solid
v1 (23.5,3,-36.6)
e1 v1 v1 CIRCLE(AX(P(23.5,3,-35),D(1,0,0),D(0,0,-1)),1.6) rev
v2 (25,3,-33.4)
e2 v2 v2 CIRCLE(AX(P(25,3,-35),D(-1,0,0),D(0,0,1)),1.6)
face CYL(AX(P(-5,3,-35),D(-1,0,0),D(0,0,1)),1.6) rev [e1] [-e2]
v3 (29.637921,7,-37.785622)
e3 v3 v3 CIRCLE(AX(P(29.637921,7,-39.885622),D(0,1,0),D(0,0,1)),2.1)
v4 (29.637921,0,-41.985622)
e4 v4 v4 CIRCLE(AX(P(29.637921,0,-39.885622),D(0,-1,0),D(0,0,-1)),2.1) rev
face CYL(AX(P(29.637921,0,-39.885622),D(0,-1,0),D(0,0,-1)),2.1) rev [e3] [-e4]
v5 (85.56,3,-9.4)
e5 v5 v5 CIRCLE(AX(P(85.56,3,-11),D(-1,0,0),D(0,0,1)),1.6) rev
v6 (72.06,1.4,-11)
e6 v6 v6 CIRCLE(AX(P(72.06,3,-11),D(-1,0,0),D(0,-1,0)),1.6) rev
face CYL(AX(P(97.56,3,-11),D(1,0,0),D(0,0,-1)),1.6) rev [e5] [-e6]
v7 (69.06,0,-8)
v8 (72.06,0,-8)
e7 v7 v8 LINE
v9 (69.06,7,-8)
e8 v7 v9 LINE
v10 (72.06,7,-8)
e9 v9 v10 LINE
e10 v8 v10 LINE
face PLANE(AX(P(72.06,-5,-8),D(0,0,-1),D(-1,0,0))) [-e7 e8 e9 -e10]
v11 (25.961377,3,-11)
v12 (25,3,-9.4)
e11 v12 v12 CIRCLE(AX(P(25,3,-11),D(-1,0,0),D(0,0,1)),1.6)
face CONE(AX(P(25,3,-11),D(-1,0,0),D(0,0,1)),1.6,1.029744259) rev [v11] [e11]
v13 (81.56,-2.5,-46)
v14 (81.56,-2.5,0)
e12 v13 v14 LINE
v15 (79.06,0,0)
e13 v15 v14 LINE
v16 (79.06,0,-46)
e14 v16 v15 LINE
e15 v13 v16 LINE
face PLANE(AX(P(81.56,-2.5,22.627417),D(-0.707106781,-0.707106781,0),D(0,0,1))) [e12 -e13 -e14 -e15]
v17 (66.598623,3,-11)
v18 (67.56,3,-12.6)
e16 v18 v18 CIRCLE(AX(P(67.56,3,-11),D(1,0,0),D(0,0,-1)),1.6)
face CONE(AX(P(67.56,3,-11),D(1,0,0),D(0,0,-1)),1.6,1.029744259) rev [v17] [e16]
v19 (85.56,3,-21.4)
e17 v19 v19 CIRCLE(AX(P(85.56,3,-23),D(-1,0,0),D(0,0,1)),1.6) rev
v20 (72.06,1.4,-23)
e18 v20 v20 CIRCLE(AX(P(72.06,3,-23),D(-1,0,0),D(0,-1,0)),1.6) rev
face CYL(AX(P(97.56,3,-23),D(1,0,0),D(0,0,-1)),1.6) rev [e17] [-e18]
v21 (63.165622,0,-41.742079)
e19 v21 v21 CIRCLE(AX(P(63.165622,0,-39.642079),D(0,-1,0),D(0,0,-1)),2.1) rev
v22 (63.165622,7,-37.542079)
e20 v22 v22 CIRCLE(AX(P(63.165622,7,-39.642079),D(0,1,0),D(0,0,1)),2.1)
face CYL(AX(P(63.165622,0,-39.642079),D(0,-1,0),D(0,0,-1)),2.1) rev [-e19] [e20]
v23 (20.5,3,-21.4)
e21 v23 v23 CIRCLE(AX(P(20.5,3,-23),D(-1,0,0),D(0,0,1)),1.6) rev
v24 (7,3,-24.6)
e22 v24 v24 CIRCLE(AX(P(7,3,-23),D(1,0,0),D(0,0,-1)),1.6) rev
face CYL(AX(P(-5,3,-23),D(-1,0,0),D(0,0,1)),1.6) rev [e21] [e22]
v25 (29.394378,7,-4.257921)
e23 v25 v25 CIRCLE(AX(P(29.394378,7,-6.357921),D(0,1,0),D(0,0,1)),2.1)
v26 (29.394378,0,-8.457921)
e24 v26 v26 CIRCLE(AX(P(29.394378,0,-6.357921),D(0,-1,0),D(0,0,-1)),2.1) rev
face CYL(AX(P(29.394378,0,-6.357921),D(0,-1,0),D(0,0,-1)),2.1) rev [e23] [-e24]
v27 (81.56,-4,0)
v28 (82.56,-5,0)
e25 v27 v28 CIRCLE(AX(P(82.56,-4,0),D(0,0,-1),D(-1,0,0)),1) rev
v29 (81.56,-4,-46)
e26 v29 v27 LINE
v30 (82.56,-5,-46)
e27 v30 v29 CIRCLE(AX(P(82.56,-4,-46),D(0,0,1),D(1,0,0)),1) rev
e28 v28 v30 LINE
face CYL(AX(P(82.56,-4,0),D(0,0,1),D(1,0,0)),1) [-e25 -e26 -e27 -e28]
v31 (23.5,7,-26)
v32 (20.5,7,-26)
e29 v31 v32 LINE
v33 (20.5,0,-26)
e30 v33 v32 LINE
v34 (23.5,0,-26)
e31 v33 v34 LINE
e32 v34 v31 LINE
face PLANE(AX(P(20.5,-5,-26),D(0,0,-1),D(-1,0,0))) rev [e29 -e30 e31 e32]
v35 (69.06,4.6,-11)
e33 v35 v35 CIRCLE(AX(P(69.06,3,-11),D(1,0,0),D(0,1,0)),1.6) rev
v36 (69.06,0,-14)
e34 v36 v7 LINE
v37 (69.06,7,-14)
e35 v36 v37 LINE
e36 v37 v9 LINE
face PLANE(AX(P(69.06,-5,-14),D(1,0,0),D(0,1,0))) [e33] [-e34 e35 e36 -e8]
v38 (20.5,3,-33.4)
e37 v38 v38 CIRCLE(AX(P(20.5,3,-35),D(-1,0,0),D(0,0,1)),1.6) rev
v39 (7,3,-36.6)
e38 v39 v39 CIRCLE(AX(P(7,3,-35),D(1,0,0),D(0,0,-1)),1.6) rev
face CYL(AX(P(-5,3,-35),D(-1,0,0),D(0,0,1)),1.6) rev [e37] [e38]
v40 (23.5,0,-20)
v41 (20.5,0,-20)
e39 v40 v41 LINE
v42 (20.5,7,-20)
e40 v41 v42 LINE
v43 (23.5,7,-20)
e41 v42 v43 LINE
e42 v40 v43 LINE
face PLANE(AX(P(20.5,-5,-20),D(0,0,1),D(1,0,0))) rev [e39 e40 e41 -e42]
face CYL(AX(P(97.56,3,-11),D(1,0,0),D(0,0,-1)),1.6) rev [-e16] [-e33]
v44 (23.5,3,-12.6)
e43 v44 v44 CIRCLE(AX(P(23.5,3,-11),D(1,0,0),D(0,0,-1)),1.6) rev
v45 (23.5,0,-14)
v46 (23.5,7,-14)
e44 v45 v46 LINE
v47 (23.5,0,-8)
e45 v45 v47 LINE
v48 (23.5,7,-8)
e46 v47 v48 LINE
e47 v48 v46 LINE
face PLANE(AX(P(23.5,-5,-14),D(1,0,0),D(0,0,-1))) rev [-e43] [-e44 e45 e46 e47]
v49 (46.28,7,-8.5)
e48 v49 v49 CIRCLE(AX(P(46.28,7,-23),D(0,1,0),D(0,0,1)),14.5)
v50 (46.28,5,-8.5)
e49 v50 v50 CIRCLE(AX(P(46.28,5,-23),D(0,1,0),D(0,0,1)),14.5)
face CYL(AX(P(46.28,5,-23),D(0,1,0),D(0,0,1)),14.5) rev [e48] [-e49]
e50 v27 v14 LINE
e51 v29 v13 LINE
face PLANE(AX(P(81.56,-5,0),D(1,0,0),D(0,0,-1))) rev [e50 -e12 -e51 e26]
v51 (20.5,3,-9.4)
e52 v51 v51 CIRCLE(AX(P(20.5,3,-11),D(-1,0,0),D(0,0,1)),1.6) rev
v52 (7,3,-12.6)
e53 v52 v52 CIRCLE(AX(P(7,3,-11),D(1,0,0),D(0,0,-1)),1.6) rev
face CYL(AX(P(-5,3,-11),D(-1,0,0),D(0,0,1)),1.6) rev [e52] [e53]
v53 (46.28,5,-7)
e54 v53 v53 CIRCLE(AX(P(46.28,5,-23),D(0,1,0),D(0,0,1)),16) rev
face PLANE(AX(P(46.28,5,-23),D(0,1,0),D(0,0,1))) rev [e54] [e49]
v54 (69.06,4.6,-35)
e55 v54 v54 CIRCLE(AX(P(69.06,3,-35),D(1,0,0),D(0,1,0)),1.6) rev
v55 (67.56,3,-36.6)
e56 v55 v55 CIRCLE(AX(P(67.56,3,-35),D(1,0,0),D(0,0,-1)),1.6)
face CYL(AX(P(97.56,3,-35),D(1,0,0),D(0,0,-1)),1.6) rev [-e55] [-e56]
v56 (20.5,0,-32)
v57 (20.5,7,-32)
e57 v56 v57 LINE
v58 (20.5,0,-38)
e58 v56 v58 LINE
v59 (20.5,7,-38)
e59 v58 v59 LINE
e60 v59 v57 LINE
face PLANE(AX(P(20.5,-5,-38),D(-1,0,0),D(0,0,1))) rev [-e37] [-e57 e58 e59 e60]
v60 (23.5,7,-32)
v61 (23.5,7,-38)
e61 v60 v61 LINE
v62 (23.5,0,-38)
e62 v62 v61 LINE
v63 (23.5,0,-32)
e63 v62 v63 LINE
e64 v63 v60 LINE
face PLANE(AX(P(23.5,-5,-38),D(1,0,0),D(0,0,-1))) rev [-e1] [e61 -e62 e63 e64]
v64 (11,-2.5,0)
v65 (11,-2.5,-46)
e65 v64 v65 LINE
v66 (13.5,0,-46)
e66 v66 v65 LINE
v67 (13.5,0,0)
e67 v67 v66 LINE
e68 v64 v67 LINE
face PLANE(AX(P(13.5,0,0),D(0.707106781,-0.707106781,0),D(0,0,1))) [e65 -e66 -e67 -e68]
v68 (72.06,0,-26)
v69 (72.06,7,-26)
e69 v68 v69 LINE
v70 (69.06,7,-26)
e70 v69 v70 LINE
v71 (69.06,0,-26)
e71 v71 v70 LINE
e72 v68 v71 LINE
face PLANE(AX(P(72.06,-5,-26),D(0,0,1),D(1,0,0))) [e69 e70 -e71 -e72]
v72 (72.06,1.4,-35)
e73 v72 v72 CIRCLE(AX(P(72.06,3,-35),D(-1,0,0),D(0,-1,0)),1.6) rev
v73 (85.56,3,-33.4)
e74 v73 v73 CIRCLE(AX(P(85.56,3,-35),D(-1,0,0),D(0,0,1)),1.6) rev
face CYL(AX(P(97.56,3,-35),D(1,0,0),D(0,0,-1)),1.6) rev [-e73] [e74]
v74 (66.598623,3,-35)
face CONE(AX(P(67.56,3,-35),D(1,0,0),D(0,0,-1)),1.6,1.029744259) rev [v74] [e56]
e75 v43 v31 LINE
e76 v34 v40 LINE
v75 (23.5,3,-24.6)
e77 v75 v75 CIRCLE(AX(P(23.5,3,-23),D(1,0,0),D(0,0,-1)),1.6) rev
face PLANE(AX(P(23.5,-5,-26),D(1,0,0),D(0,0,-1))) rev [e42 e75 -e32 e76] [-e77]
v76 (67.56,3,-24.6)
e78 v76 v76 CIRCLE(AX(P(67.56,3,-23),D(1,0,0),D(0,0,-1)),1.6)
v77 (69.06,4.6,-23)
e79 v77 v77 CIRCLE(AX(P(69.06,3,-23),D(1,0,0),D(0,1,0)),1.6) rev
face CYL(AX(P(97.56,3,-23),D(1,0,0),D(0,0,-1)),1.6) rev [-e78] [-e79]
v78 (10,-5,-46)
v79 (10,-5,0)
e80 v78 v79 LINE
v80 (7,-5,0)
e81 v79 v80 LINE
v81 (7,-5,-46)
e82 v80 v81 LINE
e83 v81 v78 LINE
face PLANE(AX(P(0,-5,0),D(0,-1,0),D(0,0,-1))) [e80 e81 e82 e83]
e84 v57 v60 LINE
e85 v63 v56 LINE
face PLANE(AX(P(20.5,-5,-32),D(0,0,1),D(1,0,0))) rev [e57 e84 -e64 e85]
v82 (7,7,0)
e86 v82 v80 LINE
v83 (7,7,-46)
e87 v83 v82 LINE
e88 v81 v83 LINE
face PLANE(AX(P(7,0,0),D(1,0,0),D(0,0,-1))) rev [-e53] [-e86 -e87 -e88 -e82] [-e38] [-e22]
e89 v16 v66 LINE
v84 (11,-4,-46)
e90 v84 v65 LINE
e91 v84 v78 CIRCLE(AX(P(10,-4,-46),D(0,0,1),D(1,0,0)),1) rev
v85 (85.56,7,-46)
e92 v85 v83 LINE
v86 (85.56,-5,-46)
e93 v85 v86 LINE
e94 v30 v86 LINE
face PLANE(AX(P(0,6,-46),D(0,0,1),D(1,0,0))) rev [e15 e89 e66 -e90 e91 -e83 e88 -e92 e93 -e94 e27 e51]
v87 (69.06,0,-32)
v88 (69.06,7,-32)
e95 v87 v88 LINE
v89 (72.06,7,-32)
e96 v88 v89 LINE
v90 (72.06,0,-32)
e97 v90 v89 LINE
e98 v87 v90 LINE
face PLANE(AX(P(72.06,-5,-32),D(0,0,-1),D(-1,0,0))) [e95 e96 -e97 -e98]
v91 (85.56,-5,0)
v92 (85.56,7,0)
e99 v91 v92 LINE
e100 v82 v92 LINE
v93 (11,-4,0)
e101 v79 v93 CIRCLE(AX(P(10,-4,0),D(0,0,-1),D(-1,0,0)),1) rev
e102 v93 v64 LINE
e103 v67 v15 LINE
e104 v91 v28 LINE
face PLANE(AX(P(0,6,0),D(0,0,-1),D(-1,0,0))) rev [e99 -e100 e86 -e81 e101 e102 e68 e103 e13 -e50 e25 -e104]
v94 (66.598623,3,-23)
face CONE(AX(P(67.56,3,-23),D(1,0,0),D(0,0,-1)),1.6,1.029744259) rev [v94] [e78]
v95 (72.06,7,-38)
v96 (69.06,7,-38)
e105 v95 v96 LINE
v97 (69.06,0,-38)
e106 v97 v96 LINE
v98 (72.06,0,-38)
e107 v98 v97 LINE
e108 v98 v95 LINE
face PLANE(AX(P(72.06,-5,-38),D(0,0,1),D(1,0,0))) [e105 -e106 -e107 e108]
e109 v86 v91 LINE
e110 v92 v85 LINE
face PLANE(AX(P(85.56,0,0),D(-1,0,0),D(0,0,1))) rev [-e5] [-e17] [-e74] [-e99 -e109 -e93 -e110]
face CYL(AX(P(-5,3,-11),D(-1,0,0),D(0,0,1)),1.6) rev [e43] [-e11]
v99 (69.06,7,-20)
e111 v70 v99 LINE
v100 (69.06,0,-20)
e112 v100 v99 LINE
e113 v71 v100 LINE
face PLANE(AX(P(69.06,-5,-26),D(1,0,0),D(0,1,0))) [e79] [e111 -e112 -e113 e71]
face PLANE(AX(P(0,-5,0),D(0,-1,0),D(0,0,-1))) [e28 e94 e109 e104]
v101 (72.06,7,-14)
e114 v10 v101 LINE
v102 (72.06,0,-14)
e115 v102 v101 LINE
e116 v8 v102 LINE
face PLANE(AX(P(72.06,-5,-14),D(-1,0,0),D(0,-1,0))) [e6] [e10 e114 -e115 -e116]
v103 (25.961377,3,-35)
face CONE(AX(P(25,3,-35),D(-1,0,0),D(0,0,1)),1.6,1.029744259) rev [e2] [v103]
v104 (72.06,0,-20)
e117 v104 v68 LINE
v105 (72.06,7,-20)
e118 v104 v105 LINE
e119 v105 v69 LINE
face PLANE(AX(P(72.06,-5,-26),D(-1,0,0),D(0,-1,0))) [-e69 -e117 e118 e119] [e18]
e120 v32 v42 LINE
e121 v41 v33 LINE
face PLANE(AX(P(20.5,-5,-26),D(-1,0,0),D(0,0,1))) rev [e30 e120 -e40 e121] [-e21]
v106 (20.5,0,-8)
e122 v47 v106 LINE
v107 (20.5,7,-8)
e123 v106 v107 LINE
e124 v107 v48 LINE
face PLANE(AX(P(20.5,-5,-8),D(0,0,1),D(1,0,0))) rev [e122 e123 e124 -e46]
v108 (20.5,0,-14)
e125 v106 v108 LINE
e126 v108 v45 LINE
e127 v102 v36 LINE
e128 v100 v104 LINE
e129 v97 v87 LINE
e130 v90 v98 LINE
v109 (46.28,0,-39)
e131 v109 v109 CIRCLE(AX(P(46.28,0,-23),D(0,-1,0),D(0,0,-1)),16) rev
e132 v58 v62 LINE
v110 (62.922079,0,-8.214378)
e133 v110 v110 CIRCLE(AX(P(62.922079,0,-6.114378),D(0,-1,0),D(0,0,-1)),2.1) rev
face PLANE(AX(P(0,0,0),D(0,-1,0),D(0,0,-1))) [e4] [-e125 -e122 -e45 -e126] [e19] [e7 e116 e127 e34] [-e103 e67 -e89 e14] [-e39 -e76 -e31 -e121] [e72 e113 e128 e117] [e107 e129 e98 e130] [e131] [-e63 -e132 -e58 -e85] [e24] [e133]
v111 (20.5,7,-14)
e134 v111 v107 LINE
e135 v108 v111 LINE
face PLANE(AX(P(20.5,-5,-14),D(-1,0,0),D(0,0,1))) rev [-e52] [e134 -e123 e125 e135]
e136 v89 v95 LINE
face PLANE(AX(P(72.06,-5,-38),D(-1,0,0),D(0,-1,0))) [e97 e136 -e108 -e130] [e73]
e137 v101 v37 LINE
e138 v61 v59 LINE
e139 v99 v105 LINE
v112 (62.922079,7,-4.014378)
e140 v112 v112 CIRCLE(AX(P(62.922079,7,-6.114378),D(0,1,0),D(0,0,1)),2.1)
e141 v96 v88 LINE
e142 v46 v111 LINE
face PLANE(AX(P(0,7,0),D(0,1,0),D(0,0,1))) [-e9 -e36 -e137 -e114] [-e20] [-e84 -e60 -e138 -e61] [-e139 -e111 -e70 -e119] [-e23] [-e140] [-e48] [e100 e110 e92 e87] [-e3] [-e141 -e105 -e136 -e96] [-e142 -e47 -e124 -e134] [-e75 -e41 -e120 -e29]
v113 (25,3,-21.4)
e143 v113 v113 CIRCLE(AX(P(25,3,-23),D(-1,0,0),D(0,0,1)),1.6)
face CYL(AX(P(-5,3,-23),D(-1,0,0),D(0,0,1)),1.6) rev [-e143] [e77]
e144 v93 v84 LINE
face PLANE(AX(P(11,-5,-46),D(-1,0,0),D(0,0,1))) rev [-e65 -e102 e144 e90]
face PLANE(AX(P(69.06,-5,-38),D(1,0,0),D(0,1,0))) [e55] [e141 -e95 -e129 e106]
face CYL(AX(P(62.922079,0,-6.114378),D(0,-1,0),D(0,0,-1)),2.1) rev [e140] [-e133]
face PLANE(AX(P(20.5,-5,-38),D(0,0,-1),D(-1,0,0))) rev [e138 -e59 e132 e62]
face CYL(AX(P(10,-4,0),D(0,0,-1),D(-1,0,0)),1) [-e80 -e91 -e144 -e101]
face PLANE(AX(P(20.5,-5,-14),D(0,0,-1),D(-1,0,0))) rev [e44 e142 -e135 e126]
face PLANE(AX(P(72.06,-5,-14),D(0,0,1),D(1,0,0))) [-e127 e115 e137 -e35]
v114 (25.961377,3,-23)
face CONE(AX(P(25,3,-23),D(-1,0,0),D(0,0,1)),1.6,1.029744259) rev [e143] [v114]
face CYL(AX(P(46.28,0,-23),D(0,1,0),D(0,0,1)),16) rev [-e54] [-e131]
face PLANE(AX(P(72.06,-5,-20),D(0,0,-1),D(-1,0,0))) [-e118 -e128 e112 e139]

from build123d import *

# Parameters (mm, degrees)
SKETCH1_W                  = 92.56
SKETCH1_H                  = 46
BOSS_EXTRUDE1_DEPTH        = 6
BOSS_EXTRUDE2_DEPTH        = 54
SKETCH3_R                  = 16.000000000000007
CUT_EXTRUDE1_DEPTH         = 120.51298506856901
SKETCH4_R                  = 16.000000000000004
CUT_EXTRUDE2_DEPTH         = 117.61626644683837
F_4_2_4_2_DIAMETER_HOLE1_D = 4.2
F_4_2_4_2_DIAMETER_HOLE2_D = 4.2
CHAMFER1_SIZE              = 3.5
CHAMFER2_SIZE              = 6
BOSS_EXTRUDE3_DEPTH        = 46
FILLET1_R                  = 2.5
CHAMFER3_SIZE              = 2.5
FILLET2_R                  = 2.5
M3_CLEARANCE_HOLE2_D       = 3.2
M3_CLEARANCE_HOLE2_DEPTH   = 30
M3_CLEARANCE_HOLE2_TIP     = 0.9613769904440965
M3_CLEARANCE_HOLE1_D       = 3.2
M3_CLEARANCE_HOLE1_DEPTH   = 30
M3_CLEARANCE_HOLE1_TIP     = 0.9613769904440965
SKETCH18_W                 = 3
SKETCH18_H                 = 6.0000000000000036
CUT_EXTRUDE4_DEPTH         = 121.62318848380691
SKETCH19_R                 = 16.000000000000004
SKETCH19_R_2               = 14.499999999999998
BOSS_EXTRUDE10_DEPTH       = 1
SKETCH21_R                 = 16.000000000000004
SKETCH21_R_2               = 2.09999999999999
SKETCH21_R_3               = 2.0999999999999934
BOSS_EXTRUDE12_DEPTH       = 3
FILLET3_R                  = 10
SKETCH22_W                 = 3.9999999999999716
SKETCH22_H                 = 2.4999999999999836
SKETCH22_W_2               = 4.000000000000001
SKETCH22_H_2               = 2.5
CUT_EXTRUDE5_DEPTH         = 98.88009812622792
SKETCH23_W                 = 4.000000000000001
SKETCH23_H                 = 46
BOSS_EXTRUDE13_DEPTH       = 2.5
FILLET4_R                  = 1
CUT_EXTRUDE6_START         = -3
CUT_EXTRUDE6_DEPTH         = 3
BOSS_EXTRUDE14_START       = 1
SKETCH25_R                 = 2.09999999999999
SKETCH25_R_2               = 2.0999999999999934
SKETCH25_R_3               = 14.499999999999998
BOSS_EXTRUDE14_DEPTH       = 1


with BuildPart() as part:
    # Sketch1 → Boss-Extrude1 (new body)
    with BuildSketch(Plane(origin=(0, 0, 0), x_dir=(1, 0, 0), z_dir=(0, 1, 0))):
        with Locations((46.28, 23)):
            Rectangle(SKETCH1_W, SKETCH1_H)
    extrude(amount=BOSS_EXTRUDE1_DEPTH)

    # Sketch2 → Boss-Extrude2 (add)
    with BuildSketch(Plane(origin=(0, 6, 0), x_dir=(1, 0, 0), z_dir=(0, 1, 0))):
        Polygon((92.56, 46), (85.56000000000003, 46), (85.56000000000002, 0), (92.56, 0), align=None)
        Polygon((0, 46), (6.999999999999999, 45.999999999999986), (6.999999999999999, 0), (0, 0), align=None)
    extrude(amount=BOSS_EXTRUDE2_DEPTH)

    # Sketch3 → Cut-Extrude1 (cut, through all)
    with BuildSketch(Plane(origin=(92.56, 0, 0), x_dir=(0, 0, -1), z_dir=(1, 0, 0))):
        with Locations((22.999999999999996, 37)):
            Circle(SKETCH3_R)
    extrude(amount=-CUT_EXTRUDE1_DEPTH, mode=Mode.SUBTRACT)

    # Sketch4 → Cut-Extrude2 (cut, through all)
    with BuildSketch(Plane(origin=(0, 6, 0), x_dir=(1, 0, 0), z_dir=(0, 1, 0))):
        with Locations(Location((46.28, 23, 0), (0, 0, 270))):
            Circle(SKETCH4_R)
    extrude(amount=-CUT_EXTRUDE2_DEPTH, mode=Mode.SUBTRACT)

    # Ø4.2 (4.2) Diameter Hole1 (through all)
    with Locations(Plane(origin=(0, 0, 0), x_dir=(-1, 0, 0), z_dir=(0, -1, 0))):
        with Locations((-63.165621688, 39.642079068), (-29.637920932, 39.885621688), (-29.394378312, 6.357920932), (-62.922079068, 6.114378312)):
            Hole(F_4_2_4_2_DIAMETER_HOLE1_D / 2)

    # Ø4.2 (4.2) Diameter Hole2 (through all)
    with Locations(Plane.ZY):
        with Locations((-39.885621688, 53.642079068), (-6.357920932, 53.885621688), (-6.114378312, 20.357920932), (-39.642079068, 20.114378312)):
            Hole(F_4_2_4_2_DIAMETER_HOLE2_D / 2)

    # Chamfer1
    chamfer1_edges = [part.edges().sort_by_distance(p)[0] for p in [
        (89.06000000000002, 60, -46),
        (89.06, 60, 0),
        (3.4999999999999996, 60, 0),
        (3.4999999999999996, 60, -45.99999999999999),
    ]]
    chamfer(chamfer1_edges, length=CHAMFER1_SIZE)

    # Chamfer2
    chamfer2_edges = [part.edges().sort_by_distance(p)[0] for p in [
        (85.56000000000003, 6, -23),
        (6.999999999999999, 6, -22.999999999999993),
    ]]
    chamfer(chamfer2_edges, length=CHAMFER2_SIZE)

    # Sketch10 → Boss-Extrude3 (add)
    with BuildSketch(Plane(origin=(0, 0, -46), x_dir=(-1, 0, 0), z_dir=(0, 0, -1))):
        Polygon((7.5e-16, 11.000000000000002), (5.000000000000001, 11), (4.9999999999999885, -4.999999999999999), (-11.000000000000004, -4.999999999999989), (-10.999999999999996, 0), (0, 0), align=None)
        Polygon((-81.56000000000003, 0), (-92.56000000000003, 0), (-92.56000000000003, 11.000000000000002), (-97.56000000000003, 11), (-97.56000000000002, -4.999999999999999), (-81.56000000000002, -4.999999999999989), align=None)
    extrude(amount=-BOSS_EXTRUDE3_DEPTH)

    # Fillet1
    fillet1_edges = [part.edges().sort_by_distance(p)[0] for p in [
        (-5.000000000000001, 11, -23),
        (11.000000000000004, -4.999999999999989, -23),
        (81.56000000000002, -4.999999999999989, -23),
        (97.56000000000003, 11, -23),
    ]]
    fillet(fillet1_edges, radius=FILLET1_R)

    # Chamfer3
    chamfer3_edges = [part.edges().sort_by_distance(p)[0] for p in [
        (92.56000000000003, 11.000000000000002, -23),
        (81.56000000000003, 0, -23),
        (10.999999999999996, 0, -23),
        (-7.5e-16, 11.000000000000002, -23),
    ]]
    chamfer(chamfer3_edges, length=CHAMFER3_SIZE - 0.0001)  # a hair under: the kernel refuses the full size

    # Fillet2
    fillet2_edges = [part.edges().sort_by_distance(p)[0] for p in [
        (-4.9999999999999885, -4.999999999999999, -23),
        (97.56000000000002, -4.999999999999999, -23),
    ]]
    fillet(fillet2_edges, radius=FILLET2_R)

    # M3 Clearance Hole2
    with Locations(Plane.ZY.offset(4.999999999999992)):
        with Locations((-11, 3), (-23, 3), (-35, 3)):
            Hole(M3_CLEARANCE_HOLE2_D / 2, depth=M3_CLEARANCE_HOLE2_DEPTH)
            with Locations((0, 0, -(M3_CLEARANCE_HOLE2_DEPTH + M3_CLEARANCE_HOLE2_TIP / 2))):  # 118° drill point
                Cone(0, M3_CLEARANCE_HOLE2_D / 2, M3_CLEARANCE_HOLE2_TIP, mode=Mode.SUBTRACT)

    # M3 Clearance Hole1
    with Locations(Plane(origin=(97.56000000000002, -8.462e-14, 0), x_dir=(0, 0, -1), z_dir=(1, -8.7e-16, 0))):
        with Locations((11, 3), (23, 3), (35, 3)):
            Hole(M3_CLEARANCE_HOLE1_D / 2, depth=M3_CLEARANCE_HOLE1_DEPTH)
            with Locations((0, 0, -(M3_CLEARANCE_HOLE1_DEPTH + M3_CLEARANCE_HOLE1_TIP / 2))):  # 118° drill point
                Cone(0, M3_CLEARANCE_HOLE1_D / 2, M3_CLEARANCE_HOLE1_TIP, mode=Mode.SUBTRACT)

    # Sketch18 → Cut-Extrude4 (cut, through all)
    with BuildSketch(Plane(origin=(0, 6, 0), x_dir=(1, 0, 0), z_dir=(0, 1, 0))):
        with Locations((21.999999999999996, 23)):
            Rectangle(SKETCH18_W, SKETCH18_H)
        Polygon((20.499999999999957, 38), (20.499999999999957, 32), (23.499999999999954, 32), (23.499999999999954, 38.00000000000001), align=None)
        Polygon((20.50000000000012, 13.999999999999998), (20.50000000000012, 8), (23.50000000000012, 8), (23.50000000000012, 14.000000000000002), align=None)
    cut_extrude4 = extrude(amount=-CUT_EXTRUDE4_DEPTH, mode=Mode.SUBTRACT)

    # Mirror1: Cut-Extrude4 across plane
    add(cut_extrude4.mirror(Plane.ZY.offset(-46.280000000000015)), mode=Mode.SUBTRACT)

    # SurfaceCut1
    split(bisect_by=Plane(origin=(6.999999999999999, 0, 0), x_dir=(0, 0, -1), z_dir=(1, 0, 0)), keep=Keep.TOP)

    # SurfaceCut2
    split(bisect_by=Plane.ZY.offset(-85.56000000000002), keep=Keep.TOP)

    # Sketch19 → Boss-Extrude10 (add)
    with BuildSketch(Plane(origin=(0, 6, 0), x_dir=(1, 0, 0), z_dir=(0, 1, 0))):
        with Locations(Location((46.28, 23, 0), (0, 0, 270))):
            Circle(SKETCH19_R)
        with Locations(Location((46.28, 23, 0), (0, 0, 270))):
            Circle(SKETCH19_R_2, mode=Mode.SUBTRACT)
    extrude(amount=-BOSS_EXTRUDE10_DEPTH)

    # Sketch21 → Boss-Extrude12 (add)
    with BuildSketch(Plane.XZ):
        with BuildLine():
            ThreePointArc((31.733605244214736, -10.77697256777753), (27.280501243582478, -23.138010886850143), (31.912705111035624, -35.43305423351552))
            ThreePointArc((31.912705111035624, -35.43305423351552), (26.128161464854706, -43.446743489319495), (34.056972567779034, -37.54639475578653))
            ThreePointArc((34.056972567779034, -37.54639475578653), (46.418010886852265, -41.99949875641751), (58.71305423351724, -37.36729488896288))
            ThreePointArc((58.71305423351724, -37.36729488896288), (66.72674348932048, -43.15183853514533), (60.82639475578562, -35.22302743222205))
            ThreePointArc((60.82639475578562, -35.22302743222205), (65.27949875641751, -22.861989113148052), (60.64729488896237, -10.566945766482164))
            ThreePointArc((60.64729488896237, -10.566945766482164), (66.43183853514634, -2.553256510679747), (58.50302743222354, -8.453605244215632))
            ThreePointArc((58.50302743222354, -8.453605244215632), (46.14198911315015, -4.000501243582477), (33.84694576648387, -8.63270511103615))
            ThreePointArc((33.84694576648387, -8.63270511103615), (25.833256510680727, -2.848161464853713), (31.733605244214736, -10.77697256777753))
        make_face()
        with Locations(Location((46.28, -23, 0), (0, 0, 90))):
            Circle(SKETCH21_R, mode=Mode.SUBTRACT)
        with Locations(Location((63.16562168832614, -39.642079067819566, 0), (0, 0, 270))):
            Circle(SKETCH21_R_2, mode=Mode.SUBTRACT)
        with Locations(Location((62.92207906782046, -6.114378311673986, 0), (0, 0, 270))):
            Circle(SKETCH21_R_2, mode=Mode.SUBTRACT)
        with Locations(Location((29.39437831167488, -6.357920932179663, 0), (0, 0, 270))):
            Circle(SKETCH21_R_3, mode=Mode.SUBTRACT)
        with Locations(Location((29.637920932180556, -39.88562168832524, 0), (0, 0, 270))):
            Circle(SKETCH21_R_3, mode=Mode.SUBTRACT)
    extrude(amount=BOSS_EXTRUDE12_DEPTH)

    # Fillet3
    fillet3_edges = [part.edges().sort_by_distance(p)[0] for p in [
        (34.05697256777903, -1.5, -37.54639475578654),
        (58.71305423351724, -1.5, -37.367294888962874),
        (60.82639475578563, -1.5, -35.223027432222054),
        (60.64729488896237, -1.5, -10.566945766482165),
        (58.50302743222355, -1.5, -8.45360524421563),
        (33.84694576648387, -1.5, -8.632705111036152),
        (31.733605244214736, -1.5, -10.77697256777753),
        (31.912705111035624, -1.5, -35.43305423351552),
    ]]
    fillet(fillet3_edges, radius=FILLET3_R)

    # Sketch22 → Cut-Extrude5 (cut, through all)
    with BuildSketch(Plane.XY):
        Polygon((6.999999999999999, 6), (85.56000000000003, 6), (85.56000000000002, 12.000000000000032), (6.999999999999999, 12.000000000000032), align=None)
        with Locations((83.56000000000002, -3.75)):
            Rectangle(SKETCH22_W, SKETCH22_H)
        with Locations((9, -3.749999999999991)):
            Rectangle(SKETCH22_W_2, SKETCH22_H_2)
    extrude(amount=-CUT_EXTRUDE5_DEPTH, mode=Mode.SUBTRACT)

    # Sketch23 → Boss-Extrude13 (add)
    with BuildSketch(Plane.XZ.offset(2.499999999999991)):
        Polygon((85.56, 0), (81.56000000000003, 0), (81.56000000000003, -46), (85.56000000000003, -46), align=None)
        with Locations((9, -23)):
            Rectangle(SKETCH23_W, SKETCH23_H)
    extrude(amount=BOSS_EXTRUDE13_DEPTH)

    # Fillet4
    fillet4_edges = [part.edges().sort_by_distance(p)[0] for p in [
        (81.56000000000003, -4.999999999999991, -23),
        (11, -4.999999999999991, -23),
    ]]
    fillet(fillet4_edges, radius=FILLET4_R)

    # Sketch24 → Cut-Extrude6 (cut)
    with BuildSketch(Plane.XZ.offset(3).offset(CUT_EXTRUDE6_START)):
        with BuildLine():
            ThreePointArc((25.820984830449497, -36.655916005867134), (26.128161464854706, -43.4467434893195), (32.92273473501672, -43.655236825271864))
            ThreePointArc((32.92273473501672, -43.655236825271864), (37.11273732148315, -41.481723677867), (41.83292705079626, -41.47223706497024))
            ThreePointArc((41.83292705079626, -41.47223706497024), (46.41801088685131, -41.99949875641751), (50.99495131648547, -41.40568483059437))
            ThreePointArc((50.99495131648547, -41.40568483059437), (55.714780767284765, -41.34659987559651), (59.93591600586793, -43.45901516955053))
            ThreePointArc((59.93591600586793, -43.45901516955053), (66.72674348932048, -43.15183853514533), (66.93523682527251, -36.357265264983134))
            ThreePointArc((66.93523682527251, -36.357265264983134), (64.76172367786731, -32.16726267851662), (64.75223706497036, -27.447072949203285))
            ThreePointArc((64.75223706497036, -27.447072949203285), (65.27949875641752, -22.861989113148752), (64.68568483059452, -18.285048683515118))
            ThreePointArc((64.68568483059452, -18.285048683515118), (64.62659987559687, -13.565219232715643), (66.73901516955122, -9.344083994132449))
            ThreePointArc((66.73901516955122, -9.344083994132449), (66.43183853514634, -2.55325651067974), (59.637265264984, -2.3447631747276247))
            ThreePointArc((59.637265264984, -2.3447631747276247), (55.44726267851733, -4.518276322132929), (50.72707294920381, -4.527762935029777))
            ThreePointArc((50.72707294920381, -4.527762935029777), (46.141989113149215, -4.000501243582487), (41.565048683515485, -4.594315169405377))
            ThreePointArc((41.565048683515485, -4.594315169405377), (36.845219232716246, -4.6534001244030065), (32.62408399413323, -2.5409848304488194))
            ThreePointArc((32.62408399413323, -2.5409848304488194), (25.833256510680723, -2.8481614648537166), (25.624763174728287, -9.642734735015843))
            ThreePointArc((25.624763174728287, -9.642734735015843), (27.798276322133216, -13.832737321482442), (27.807762935029885, -18.552927050795727))
            ThreePointArc((27.807762935029885, -18.552927050795727), (27.280501243582485, -23.138010886850843), (27.874315169405524, -27.71495131648509))
            ThreePointArc((27.874315169405524, -27.71495131648509), (27.93340012440335, -32.434780767284145), (25.820984830449497, -36.655916005867134))
        make_face()
    extrude(amount=CUT_EXTRUDE6_DEPTH, mode=Mode.SUBTRACT)

    # Sketch25 → Boss-Extrude14 (add)
    with BuildSketch(Plane(origin=(0, 6, 0), x_dir=(1, 0, 0), z_dir=(0, 1, 0)).offset(BOSS_EXTRUDE14_START)):
        Polygon((85.56000000000003, 46), (6.999999999999999, 46), (6.999999999999999, 0), (85.56000000000002, 0), align=None)
        with Locations(Location((62.92207906782046, 6.114378311673986, 0), (0, 0, 90))):
            Circle(SKETCH25_R, mode=Mode.SUBTRACT)
        with Locations(Location((29.39437831167488, 6.357920932179663, 0), (0, 0, 90))):
            Circle(SKETCH25_R_2, mode=Mode.SUBTRACT)
        with Locations(Location((29.637920932180556, 39.88562168832524, 0), (0, 0, 90))):
            Circle(SKETCH25_R_2, mode=Mode.SUBTRACT)
        with Locations(Location((63.16562168832614, 39.642079067819566, 0), (0, 0, 90))):
            Circle(SKETCH25_R, mode=Mode.SUBTRACT)
        with Locations(Location((46.28, 23, 0), (0, 0, 270))):
            Circle(SKETCH25_R_3, mode=Mode.SUBTRACT)
        Polygon((72.06000000000007, 32), (69.06000000000007, 32), (69.06000000000007, 38.00000000000001), (72.06000000000007, 38), align=None, mode=Mode.SUBTRACT)
        Polygon((23.50000000000007, 31.99999999999966), (20.50000000000008, 31.99999999999966), (20.50000000000008, 37.999999999999666), (23.50000000000007, 37.99999999999966), align=None, mode=Mode.SUBTRACT)
        Polygon((23.500000000000195, 19.999999999999662), (20.500000000000206, 19.999999999999662), (20.500000000000206, 25.99999999999967), (23.500000000000195, 25.999999999999662), align=None, mode=Mode.SUBTRACT)
        Polygon((23.50000000000032, 7.999999999999667), (20.50000000000033, 7.999999999999667), (20.50000000000033, 13.999999999999673), (23.50000000000032, 13.999999999999666), align=None, mode=Mode.SUBTRACT)
        Polygon((72.06000000000019, 20.000000000000004), (69.0600000000002, 20.000000000000004), (69.0600000000002, 26.00000000000001), (72.06000000000019, 26.000000000000004), align=None, mode=Mode.SUBTRACT)
        Polygon((72.06000000000031, 8.000000000000007), (69.06000000000033, 8.000000000000007), (69.06000000000033, 14.000000000000012), (72.06000000000031, 14.000000000000005), align=None, mode=Mode.SUBTRACT)
    extrude(amount=-BOSS_EXTRUDE14_DEPTH)


solid = part.part
